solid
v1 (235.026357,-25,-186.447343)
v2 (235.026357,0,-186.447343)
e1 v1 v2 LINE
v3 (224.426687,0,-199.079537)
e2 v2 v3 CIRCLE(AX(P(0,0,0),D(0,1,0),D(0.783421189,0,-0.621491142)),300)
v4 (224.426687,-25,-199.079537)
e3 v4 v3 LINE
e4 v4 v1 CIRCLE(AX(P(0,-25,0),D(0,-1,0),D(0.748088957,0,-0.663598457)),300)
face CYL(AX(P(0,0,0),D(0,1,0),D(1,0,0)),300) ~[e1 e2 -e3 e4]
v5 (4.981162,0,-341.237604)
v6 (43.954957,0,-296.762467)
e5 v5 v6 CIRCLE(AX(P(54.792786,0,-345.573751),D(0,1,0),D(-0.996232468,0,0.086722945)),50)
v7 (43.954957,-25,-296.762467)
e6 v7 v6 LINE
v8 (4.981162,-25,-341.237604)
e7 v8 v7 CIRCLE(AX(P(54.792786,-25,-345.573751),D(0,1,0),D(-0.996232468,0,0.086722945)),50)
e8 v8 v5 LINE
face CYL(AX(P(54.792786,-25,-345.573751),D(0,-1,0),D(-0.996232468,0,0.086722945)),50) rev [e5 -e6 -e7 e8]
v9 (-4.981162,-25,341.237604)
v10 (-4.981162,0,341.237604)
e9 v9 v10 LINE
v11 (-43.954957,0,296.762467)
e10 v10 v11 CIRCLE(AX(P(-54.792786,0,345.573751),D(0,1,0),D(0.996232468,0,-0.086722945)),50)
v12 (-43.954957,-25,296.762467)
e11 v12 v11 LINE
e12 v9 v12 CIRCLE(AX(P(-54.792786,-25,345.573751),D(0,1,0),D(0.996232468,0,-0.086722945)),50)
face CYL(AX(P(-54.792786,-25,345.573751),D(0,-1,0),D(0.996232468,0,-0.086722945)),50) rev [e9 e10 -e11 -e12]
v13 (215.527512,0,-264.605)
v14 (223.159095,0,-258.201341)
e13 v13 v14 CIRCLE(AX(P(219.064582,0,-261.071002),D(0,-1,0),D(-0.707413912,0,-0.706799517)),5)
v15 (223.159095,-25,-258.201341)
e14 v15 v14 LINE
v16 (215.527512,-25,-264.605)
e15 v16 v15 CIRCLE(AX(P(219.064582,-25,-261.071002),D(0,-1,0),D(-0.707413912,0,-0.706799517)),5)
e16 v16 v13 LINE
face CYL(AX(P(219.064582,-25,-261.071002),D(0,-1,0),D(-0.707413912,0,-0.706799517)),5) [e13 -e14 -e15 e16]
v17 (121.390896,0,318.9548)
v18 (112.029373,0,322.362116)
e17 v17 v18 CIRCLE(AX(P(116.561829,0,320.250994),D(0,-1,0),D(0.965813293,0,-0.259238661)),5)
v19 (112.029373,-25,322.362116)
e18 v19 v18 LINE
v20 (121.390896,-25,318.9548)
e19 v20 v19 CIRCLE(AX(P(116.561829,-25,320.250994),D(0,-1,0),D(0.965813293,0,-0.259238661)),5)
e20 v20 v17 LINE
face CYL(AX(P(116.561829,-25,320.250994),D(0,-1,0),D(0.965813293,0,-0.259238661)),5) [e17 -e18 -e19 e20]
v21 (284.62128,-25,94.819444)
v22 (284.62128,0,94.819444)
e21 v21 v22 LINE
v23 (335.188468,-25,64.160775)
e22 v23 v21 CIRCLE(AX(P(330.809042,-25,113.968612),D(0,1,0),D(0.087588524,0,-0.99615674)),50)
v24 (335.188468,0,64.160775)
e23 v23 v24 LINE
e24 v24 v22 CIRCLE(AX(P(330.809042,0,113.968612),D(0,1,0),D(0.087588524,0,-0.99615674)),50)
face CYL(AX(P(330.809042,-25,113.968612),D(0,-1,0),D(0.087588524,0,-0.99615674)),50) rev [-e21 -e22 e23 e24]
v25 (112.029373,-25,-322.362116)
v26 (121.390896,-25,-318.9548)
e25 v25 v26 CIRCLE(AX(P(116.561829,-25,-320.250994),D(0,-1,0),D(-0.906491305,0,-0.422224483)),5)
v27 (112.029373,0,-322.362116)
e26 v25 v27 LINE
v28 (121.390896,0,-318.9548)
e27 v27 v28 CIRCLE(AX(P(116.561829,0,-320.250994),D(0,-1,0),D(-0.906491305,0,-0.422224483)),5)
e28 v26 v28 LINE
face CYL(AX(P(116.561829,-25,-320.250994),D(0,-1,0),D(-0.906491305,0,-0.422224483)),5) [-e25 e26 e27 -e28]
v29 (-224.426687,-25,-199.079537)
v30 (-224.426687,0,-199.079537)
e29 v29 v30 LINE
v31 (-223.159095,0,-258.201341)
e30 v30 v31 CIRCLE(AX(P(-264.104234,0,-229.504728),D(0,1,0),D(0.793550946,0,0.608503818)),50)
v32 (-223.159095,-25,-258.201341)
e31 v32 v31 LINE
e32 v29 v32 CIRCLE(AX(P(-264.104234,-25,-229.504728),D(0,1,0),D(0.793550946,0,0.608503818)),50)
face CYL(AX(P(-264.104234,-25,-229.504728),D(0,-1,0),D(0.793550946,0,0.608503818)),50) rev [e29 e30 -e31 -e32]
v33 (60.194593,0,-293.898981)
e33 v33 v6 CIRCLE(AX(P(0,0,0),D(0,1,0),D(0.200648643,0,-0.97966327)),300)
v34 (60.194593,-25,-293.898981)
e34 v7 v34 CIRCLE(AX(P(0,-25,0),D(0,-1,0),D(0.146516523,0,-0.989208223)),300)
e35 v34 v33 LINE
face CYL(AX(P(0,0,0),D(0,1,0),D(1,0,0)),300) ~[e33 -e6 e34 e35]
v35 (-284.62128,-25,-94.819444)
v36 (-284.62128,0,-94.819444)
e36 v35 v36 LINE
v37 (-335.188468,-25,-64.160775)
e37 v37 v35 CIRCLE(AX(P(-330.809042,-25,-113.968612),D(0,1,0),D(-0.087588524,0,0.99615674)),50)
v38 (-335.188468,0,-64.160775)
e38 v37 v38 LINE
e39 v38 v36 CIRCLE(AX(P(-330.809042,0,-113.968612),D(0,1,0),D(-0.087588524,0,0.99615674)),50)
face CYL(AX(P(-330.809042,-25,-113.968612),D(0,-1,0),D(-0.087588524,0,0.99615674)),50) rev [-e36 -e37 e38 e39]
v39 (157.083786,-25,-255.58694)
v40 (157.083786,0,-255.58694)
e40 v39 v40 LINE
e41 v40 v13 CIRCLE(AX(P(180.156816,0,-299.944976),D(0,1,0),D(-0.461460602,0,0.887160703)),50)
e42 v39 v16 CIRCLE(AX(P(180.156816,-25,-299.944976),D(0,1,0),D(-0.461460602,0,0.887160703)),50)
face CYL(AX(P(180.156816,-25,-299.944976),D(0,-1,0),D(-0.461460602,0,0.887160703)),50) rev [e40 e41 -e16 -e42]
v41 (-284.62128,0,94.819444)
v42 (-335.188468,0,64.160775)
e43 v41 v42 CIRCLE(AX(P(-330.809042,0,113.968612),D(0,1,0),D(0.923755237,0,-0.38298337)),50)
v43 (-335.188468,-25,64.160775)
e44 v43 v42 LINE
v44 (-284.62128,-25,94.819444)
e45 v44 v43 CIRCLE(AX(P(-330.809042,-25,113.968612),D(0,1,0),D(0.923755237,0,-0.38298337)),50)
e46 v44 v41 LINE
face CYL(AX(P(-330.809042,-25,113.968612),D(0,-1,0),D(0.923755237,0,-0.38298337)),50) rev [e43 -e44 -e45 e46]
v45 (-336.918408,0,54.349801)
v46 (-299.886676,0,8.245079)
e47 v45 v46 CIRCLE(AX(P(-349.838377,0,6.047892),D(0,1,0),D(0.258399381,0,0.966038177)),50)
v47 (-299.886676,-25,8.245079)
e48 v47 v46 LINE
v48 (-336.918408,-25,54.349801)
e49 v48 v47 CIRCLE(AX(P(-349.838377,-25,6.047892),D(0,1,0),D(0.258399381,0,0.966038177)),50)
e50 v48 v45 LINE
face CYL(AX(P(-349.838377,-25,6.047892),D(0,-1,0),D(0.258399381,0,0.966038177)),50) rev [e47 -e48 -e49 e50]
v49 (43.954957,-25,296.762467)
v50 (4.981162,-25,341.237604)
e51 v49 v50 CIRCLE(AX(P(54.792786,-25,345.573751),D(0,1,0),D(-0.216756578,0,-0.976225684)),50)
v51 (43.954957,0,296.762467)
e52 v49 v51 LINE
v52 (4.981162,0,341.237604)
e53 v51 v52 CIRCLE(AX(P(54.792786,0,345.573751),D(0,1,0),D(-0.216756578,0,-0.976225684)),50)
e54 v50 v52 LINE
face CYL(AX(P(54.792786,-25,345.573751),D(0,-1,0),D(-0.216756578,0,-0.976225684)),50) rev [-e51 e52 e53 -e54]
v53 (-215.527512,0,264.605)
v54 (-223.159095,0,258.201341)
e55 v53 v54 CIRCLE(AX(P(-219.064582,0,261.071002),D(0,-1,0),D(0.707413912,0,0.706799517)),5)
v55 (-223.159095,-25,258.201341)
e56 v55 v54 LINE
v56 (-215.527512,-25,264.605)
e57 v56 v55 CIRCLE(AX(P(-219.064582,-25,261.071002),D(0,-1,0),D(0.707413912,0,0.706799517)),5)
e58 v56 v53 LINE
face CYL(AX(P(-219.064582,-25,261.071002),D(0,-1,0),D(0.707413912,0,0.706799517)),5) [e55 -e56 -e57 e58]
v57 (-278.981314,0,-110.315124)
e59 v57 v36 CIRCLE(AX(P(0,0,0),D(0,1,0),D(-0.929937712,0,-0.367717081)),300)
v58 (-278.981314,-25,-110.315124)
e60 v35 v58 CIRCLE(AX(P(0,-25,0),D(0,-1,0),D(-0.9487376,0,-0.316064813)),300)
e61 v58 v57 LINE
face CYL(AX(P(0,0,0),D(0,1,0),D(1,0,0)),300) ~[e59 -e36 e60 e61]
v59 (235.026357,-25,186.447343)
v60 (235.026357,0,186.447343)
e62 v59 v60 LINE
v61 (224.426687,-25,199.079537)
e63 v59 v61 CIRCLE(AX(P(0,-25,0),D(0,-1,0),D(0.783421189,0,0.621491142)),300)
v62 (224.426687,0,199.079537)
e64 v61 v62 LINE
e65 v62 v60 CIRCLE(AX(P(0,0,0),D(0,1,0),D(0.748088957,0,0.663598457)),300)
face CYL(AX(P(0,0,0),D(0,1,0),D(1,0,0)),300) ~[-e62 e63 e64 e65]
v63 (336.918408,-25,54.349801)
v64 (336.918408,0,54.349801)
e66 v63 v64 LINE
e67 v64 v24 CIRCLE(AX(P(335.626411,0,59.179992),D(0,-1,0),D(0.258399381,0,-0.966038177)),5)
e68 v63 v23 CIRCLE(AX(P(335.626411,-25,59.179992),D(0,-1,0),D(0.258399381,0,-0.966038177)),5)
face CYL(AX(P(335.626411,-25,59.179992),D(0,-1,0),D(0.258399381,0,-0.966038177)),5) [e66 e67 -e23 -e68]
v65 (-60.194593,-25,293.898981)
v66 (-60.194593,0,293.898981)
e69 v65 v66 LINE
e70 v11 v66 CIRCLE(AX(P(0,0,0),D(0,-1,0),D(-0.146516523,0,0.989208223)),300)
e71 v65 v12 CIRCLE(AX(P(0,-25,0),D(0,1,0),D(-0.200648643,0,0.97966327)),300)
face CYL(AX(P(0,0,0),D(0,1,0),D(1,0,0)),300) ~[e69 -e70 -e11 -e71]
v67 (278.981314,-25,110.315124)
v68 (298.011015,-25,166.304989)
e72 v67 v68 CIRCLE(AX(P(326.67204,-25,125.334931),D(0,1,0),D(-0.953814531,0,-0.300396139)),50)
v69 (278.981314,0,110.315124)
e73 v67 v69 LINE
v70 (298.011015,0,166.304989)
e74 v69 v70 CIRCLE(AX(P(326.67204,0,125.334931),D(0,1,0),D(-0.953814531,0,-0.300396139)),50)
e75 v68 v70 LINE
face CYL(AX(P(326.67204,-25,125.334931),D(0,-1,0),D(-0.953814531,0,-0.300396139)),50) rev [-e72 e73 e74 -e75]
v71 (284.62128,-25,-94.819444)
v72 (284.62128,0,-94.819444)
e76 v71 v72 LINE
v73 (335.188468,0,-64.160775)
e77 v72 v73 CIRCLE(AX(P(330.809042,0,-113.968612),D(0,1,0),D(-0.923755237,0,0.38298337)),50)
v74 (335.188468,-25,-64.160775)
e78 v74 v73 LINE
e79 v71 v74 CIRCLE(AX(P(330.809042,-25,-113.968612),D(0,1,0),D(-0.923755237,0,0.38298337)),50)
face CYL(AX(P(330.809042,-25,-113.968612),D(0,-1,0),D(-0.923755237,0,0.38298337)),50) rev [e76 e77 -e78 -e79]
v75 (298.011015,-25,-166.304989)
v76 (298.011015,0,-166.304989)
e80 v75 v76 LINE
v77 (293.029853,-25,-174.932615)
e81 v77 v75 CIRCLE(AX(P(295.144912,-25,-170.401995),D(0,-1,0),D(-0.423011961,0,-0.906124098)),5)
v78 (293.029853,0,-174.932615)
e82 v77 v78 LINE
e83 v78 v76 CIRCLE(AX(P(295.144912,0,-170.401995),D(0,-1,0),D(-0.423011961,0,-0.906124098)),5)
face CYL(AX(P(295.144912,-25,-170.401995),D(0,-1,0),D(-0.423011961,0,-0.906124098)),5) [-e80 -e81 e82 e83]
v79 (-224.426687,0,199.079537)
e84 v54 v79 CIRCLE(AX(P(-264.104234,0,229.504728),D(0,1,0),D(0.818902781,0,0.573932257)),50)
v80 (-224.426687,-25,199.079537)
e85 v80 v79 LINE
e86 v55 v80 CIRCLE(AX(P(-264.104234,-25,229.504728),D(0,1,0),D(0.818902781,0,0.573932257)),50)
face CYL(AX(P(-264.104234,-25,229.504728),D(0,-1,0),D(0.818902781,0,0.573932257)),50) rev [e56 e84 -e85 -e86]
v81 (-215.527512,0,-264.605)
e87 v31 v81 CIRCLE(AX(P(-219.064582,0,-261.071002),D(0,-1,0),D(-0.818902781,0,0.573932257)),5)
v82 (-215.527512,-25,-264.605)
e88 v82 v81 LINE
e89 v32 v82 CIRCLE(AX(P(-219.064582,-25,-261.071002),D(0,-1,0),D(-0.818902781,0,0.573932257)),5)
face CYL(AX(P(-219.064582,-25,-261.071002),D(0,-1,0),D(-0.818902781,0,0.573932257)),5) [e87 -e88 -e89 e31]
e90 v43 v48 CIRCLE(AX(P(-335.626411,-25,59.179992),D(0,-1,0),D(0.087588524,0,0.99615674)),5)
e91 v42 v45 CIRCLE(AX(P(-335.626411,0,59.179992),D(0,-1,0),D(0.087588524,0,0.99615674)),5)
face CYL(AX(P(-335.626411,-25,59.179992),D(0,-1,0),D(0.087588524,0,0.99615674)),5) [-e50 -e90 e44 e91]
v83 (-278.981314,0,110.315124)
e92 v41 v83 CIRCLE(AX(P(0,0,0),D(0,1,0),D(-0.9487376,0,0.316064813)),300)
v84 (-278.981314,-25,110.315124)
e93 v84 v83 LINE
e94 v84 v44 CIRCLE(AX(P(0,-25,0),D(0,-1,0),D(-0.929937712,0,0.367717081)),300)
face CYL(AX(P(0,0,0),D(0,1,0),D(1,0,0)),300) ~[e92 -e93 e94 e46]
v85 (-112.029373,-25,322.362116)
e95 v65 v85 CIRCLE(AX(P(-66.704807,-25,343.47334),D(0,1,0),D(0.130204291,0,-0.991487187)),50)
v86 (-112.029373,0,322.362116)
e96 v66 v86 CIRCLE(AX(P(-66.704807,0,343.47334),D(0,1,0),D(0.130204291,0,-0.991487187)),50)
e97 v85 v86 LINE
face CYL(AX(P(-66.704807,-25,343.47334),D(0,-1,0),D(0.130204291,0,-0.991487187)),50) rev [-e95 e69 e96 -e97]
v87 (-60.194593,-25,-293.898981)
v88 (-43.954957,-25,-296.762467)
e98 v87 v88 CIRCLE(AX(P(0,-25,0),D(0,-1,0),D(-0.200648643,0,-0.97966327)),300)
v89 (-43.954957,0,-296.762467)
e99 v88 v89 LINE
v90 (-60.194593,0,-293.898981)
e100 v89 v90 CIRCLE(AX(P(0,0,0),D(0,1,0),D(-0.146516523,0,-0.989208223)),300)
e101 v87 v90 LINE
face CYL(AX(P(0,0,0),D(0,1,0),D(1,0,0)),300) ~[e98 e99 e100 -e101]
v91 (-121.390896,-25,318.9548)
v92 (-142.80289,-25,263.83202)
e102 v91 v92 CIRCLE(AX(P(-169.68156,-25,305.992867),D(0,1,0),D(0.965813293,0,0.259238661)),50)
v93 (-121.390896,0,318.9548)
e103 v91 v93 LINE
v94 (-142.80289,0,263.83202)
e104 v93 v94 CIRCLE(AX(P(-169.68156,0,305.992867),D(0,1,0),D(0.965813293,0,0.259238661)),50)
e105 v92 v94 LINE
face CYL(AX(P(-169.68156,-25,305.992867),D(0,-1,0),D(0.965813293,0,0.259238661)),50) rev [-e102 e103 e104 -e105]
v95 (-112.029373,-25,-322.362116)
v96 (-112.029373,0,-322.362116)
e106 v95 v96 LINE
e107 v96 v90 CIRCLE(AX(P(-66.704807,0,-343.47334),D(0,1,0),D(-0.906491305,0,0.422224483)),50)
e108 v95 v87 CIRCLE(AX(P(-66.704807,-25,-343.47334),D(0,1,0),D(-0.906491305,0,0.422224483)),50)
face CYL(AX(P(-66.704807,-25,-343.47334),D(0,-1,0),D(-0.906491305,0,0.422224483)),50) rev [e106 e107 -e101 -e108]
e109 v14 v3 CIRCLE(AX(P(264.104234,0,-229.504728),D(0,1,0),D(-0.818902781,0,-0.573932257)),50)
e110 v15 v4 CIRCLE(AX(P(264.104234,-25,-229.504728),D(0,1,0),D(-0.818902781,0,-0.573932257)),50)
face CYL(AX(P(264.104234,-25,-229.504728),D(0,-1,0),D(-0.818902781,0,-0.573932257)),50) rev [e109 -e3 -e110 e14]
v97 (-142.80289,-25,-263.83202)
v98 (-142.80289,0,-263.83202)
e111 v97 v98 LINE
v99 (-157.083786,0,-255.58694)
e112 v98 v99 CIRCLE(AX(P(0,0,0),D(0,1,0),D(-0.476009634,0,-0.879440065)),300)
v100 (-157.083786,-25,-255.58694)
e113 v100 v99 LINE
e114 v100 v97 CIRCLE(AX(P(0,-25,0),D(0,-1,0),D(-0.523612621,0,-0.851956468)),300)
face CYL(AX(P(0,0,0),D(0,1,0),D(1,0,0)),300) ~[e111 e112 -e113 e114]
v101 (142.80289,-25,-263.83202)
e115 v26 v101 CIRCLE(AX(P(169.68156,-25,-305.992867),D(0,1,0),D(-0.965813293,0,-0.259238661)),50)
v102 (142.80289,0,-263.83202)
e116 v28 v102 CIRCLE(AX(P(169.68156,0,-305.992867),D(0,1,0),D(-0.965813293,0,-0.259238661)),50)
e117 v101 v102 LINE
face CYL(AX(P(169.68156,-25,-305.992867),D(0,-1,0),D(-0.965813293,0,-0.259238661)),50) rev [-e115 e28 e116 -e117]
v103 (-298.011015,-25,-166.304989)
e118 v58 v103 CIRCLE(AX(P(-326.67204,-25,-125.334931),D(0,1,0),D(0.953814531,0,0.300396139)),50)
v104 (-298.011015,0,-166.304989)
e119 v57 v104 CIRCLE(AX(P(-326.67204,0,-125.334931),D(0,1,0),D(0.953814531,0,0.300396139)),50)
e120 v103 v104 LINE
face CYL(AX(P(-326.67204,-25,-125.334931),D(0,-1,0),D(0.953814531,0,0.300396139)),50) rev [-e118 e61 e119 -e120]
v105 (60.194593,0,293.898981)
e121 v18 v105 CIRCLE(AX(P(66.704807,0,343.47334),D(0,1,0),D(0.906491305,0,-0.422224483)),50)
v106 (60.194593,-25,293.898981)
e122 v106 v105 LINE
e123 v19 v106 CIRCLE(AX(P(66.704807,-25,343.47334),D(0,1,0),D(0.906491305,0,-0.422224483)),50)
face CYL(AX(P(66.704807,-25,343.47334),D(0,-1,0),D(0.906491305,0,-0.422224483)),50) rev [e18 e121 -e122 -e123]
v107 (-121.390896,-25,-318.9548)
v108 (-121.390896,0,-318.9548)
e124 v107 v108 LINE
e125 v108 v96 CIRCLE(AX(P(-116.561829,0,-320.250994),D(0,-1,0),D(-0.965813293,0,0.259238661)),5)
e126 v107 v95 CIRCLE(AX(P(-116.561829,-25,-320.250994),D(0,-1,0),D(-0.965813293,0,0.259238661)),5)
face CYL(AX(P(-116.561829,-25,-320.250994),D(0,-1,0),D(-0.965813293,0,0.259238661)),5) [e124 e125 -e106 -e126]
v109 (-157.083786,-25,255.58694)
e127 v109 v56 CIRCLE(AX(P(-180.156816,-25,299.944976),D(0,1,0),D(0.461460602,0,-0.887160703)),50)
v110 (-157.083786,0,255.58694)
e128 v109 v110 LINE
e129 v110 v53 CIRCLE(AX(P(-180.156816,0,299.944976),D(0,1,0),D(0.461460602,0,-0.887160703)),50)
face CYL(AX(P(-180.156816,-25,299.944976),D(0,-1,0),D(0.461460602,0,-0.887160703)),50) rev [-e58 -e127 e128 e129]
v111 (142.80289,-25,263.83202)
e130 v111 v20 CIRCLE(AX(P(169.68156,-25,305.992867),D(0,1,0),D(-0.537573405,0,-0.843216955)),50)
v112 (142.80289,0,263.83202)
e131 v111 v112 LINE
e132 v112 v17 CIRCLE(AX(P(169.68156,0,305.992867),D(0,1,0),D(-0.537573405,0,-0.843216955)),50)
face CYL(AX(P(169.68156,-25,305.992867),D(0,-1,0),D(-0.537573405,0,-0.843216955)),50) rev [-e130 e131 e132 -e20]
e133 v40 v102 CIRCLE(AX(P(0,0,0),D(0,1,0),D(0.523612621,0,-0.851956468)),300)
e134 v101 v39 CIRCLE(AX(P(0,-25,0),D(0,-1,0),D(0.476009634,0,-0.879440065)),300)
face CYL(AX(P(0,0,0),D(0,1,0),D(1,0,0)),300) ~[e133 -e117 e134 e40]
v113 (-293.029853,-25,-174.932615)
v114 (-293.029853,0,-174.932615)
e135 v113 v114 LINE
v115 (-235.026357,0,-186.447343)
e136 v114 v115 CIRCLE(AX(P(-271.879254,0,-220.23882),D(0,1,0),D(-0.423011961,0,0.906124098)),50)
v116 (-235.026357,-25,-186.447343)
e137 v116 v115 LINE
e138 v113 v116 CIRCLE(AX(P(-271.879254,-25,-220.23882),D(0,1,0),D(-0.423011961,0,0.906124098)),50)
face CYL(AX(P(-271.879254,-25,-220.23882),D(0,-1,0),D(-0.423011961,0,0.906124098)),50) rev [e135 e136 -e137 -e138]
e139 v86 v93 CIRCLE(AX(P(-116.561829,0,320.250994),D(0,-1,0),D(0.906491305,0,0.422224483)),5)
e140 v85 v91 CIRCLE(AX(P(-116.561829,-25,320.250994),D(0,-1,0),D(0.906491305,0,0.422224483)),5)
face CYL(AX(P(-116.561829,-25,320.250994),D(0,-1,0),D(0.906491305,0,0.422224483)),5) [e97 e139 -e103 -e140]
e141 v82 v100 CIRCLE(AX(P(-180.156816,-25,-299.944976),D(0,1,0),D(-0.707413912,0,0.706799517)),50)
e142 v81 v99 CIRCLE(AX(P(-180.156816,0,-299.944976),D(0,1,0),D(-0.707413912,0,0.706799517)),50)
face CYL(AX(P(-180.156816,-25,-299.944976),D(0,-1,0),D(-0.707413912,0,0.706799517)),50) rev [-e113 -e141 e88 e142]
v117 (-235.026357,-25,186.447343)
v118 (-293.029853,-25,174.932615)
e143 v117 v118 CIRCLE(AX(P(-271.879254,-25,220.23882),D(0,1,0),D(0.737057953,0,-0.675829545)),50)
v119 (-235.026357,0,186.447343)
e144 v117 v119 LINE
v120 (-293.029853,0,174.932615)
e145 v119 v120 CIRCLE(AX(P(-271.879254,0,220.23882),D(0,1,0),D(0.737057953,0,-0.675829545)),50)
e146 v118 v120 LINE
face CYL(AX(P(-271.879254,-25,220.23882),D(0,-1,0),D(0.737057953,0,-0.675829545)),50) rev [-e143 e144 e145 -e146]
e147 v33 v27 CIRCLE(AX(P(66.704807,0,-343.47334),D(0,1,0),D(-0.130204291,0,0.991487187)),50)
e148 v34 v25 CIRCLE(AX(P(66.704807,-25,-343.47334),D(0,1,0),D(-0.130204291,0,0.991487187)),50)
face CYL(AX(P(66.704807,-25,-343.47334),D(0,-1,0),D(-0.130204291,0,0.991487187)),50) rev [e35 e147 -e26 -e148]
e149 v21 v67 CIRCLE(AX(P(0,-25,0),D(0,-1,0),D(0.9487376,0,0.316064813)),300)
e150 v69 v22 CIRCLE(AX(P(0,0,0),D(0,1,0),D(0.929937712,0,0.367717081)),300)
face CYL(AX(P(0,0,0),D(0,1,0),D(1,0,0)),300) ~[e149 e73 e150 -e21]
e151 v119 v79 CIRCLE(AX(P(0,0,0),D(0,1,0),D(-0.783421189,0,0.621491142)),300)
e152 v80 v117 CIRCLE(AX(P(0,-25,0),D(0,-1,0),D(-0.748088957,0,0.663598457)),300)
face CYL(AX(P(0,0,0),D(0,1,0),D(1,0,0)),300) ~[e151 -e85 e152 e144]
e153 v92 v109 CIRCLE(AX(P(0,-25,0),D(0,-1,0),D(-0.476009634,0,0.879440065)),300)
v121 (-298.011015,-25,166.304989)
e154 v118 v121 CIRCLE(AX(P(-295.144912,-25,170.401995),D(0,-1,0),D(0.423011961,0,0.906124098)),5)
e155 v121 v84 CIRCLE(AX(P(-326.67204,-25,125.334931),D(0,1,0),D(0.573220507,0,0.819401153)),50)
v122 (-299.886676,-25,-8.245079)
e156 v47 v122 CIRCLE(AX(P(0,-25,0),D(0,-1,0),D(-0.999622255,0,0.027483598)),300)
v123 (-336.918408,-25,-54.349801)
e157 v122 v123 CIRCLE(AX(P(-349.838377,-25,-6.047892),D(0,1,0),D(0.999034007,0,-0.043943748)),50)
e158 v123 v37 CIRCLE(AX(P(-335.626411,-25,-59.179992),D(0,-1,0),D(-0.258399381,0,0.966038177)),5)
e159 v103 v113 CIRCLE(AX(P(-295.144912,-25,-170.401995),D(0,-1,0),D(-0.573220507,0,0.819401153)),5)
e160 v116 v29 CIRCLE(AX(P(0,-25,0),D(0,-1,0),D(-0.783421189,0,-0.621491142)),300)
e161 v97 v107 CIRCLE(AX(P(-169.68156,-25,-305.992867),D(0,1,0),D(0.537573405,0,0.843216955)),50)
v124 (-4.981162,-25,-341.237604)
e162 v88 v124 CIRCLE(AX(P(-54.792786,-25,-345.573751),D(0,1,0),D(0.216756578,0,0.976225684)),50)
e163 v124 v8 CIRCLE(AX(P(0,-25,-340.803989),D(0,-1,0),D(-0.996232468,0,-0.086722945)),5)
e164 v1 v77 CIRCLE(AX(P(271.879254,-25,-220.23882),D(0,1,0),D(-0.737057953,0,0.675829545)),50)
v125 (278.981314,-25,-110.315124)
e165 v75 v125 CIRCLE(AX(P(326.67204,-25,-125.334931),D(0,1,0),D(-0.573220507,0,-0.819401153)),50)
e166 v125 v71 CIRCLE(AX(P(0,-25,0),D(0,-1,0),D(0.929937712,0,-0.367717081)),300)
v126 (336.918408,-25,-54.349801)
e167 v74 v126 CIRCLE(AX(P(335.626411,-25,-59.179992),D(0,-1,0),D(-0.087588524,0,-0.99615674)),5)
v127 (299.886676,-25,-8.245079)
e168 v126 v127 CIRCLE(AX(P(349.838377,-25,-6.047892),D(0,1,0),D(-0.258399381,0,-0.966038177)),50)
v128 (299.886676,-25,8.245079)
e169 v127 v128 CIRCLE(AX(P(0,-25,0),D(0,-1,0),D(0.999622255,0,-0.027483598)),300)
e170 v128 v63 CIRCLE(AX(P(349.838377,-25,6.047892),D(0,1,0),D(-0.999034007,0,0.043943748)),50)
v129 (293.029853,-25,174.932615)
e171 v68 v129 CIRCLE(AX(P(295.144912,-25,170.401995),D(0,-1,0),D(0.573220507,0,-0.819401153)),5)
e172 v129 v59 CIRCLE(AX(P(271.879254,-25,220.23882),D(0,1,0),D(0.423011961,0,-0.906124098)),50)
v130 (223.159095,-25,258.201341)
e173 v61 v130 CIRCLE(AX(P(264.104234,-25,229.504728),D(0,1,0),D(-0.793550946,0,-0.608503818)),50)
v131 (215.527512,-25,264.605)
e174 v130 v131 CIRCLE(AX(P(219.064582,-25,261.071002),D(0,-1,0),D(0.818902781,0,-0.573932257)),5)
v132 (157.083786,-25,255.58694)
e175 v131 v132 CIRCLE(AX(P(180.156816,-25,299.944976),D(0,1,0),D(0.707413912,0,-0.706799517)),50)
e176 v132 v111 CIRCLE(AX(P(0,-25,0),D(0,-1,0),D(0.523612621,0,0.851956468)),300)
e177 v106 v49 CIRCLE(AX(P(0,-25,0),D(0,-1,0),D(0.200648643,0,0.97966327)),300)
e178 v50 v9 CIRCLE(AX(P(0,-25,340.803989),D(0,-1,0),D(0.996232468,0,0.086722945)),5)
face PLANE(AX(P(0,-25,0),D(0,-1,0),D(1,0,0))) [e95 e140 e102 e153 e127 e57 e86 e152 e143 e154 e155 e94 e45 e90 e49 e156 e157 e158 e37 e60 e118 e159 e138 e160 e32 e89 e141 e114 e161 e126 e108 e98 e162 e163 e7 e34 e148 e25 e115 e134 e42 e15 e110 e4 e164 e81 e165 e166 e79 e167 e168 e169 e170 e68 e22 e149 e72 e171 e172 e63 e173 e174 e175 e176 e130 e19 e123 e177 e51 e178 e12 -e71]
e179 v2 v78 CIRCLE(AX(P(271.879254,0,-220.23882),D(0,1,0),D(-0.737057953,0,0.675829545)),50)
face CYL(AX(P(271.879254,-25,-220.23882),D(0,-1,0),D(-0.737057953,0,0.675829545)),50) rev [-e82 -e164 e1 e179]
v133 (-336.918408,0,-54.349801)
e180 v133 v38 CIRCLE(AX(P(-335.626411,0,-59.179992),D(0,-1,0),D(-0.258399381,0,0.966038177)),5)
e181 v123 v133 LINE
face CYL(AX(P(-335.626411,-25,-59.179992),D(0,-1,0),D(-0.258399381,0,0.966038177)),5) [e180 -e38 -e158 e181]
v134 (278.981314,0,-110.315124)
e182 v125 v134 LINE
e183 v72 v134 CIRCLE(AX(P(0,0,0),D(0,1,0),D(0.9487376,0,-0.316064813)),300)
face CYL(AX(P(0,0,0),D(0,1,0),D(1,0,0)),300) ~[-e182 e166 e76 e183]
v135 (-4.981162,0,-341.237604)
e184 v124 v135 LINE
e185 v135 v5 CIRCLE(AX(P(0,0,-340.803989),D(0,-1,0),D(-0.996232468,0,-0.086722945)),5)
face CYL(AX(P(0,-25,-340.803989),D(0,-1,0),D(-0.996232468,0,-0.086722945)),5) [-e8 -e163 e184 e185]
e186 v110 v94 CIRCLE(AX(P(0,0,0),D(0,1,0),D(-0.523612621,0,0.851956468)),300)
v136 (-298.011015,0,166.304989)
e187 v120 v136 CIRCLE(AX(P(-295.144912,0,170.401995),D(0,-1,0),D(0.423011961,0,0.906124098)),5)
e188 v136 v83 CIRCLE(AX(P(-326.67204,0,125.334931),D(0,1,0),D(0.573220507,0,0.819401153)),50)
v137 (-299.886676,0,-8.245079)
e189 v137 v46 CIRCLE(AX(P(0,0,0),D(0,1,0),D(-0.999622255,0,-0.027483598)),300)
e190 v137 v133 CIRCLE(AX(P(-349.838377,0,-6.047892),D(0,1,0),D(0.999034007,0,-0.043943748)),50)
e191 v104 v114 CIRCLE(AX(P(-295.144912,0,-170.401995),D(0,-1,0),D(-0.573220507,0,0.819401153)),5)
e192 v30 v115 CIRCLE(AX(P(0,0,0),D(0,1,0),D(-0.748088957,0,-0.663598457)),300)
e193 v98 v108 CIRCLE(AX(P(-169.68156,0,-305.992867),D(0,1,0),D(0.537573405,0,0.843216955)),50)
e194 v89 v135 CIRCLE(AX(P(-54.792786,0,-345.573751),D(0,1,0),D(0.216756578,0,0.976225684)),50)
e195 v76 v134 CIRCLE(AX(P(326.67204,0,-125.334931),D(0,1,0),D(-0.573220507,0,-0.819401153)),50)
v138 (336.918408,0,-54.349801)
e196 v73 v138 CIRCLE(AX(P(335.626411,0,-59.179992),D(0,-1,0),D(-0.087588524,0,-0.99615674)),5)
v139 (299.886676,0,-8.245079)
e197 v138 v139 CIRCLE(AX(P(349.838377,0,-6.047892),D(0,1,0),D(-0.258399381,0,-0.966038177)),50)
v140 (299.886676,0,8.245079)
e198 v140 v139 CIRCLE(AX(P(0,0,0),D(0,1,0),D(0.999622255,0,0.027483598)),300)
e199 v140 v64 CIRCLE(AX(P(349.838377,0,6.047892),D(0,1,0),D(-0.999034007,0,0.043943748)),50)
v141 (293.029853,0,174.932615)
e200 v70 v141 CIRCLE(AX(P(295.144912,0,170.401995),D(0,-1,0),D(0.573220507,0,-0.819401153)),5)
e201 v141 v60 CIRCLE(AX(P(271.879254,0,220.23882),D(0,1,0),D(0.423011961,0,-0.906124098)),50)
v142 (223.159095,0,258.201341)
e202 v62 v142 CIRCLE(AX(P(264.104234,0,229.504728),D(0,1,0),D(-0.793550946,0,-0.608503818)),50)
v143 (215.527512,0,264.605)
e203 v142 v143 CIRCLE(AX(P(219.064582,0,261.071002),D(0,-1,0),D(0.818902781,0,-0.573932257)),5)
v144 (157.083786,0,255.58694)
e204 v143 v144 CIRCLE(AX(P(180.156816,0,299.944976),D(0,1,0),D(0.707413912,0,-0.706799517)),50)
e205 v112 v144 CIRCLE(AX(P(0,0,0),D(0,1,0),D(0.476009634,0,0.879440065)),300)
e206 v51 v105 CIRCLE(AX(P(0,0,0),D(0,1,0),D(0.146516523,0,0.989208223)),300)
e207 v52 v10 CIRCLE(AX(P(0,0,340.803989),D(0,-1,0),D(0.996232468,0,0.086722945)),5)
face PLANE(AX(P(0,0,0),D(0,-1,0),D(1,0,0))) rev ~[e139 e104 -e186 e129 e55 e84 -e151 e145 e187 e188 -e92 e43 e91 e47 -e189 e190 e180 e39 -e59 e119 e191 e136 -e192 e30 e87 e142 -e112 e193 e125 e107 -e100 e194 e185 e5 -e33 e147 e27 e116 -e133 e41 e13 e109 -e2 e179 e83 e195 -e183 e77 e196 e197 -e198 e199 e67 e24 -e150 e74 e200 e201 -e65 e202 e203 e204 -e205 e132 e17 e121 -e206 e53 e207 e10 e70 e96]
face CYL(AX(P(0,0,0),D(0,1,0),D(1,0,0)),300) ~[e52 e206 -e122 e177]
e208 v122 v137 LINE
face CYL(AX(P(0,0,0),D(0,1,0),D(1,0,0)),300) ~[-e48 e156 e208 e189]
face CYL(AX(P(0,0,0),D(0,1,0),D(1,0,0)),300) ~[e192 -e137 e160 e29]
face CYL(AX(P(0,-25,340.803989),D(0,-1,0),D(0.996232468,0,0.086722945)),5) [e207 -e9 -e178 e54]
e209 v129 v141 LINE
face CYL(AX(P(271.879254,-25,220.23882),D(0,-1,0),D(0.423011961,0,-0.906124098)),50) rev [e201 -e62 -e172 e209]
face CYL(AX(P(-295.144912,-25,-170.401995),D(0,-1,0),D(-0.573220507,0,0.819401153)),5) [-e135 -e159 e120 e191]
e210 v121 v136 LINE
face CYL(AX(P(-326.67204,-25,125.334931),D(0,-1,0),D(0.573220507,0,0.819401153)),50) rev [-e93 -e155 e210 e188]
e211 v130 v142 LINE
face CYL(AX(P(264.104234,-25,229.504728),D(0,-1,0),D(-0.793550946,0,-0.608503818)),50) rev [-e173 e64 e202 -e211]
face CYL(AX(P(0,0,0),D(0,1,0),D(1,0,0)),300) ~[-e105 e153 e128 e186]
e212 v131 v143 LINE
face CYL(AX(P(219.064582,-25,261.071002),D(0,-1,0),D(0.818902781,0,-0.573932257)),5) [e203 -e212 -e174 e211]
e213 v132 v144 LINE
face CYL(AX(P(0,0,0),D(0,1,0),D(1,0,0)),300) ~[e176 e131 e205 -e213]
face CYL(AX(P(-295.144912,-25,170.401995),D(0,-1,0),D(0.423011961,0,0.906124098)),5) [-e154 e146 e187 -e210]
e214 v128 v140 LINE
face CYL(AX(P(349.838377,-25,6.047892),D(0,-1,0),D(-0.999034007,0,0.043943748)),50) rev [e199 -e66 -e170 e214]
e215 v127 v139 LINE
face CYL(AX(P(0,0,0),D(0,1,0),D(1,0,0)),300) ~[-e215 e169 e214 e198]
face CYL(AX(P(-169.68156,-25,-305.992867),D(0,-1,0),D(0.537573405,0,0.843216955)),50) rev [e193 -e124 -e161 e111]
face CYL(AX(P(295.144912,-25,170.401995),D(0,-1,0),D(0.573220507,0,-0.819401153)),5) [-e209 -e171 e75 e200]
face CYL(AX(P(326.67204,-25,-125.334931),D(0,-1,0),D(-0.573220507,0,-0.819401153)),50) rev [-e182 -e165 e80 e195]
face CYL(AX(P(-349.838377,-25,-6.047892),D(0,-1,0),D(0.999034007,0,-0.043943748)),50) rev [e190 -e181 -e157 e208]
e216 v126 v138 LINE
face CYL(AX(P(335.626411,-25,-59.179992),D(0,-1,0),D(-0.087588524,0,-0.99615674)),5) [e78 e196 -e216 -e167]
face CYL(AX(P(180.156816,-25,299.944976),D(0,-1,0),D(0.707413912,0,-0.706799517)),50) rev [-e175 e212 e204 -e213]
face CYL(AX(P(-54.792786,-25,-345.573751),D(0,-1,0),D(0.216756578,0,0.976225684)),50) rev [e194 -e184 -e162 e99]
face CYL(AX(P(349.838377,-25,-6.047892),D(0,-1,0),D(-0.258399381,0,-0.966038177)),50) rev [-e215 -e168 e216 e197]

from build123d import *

# Parameters (mm, degrees)
F0_R            = 300
F1_DEPTH        = 25
F3_DEPTH        = 25
F3_COPIES_COUNT = 18


# Not quite as in the source:
# - a pattern or mirror of a feature is missing from the dataset's text; its kind, count and spacing are read off the source's solid


with BuildPart() as f1:
    # F0 (on Front) → F1 (new body)
    with BuildSketch(Plane.XZ):
        Circle(F0_R)
    extrude(amount=F1_DEPTH)

    # F2 (on face) → F3 (join, through all)
    with BuildSketch(Plane.XZ.offset(25)):
        with BuildLine():
            ThreePointArc((43.9549568499, 296.7624669131), (46.962798618, 296.1906436564), (50, 295.803989155))
            ThreePointArc((50, 295.803989155), (46.9799228296, 296.2986446998), (43.9549568499, 296.7624669131))
        make_face()
        with BuildLine():
            ThreePointArc((-50, 295.803989155), (-46.962798618, 296.1906436564), (-43.9549568499, 296.7624669131))
            ThreePointArc((-43.9549568499, 296.7624669131), (-46.9799228296, 296.2986446998), (-50, 295.803989155))
        make_face()
        with BuildLine():
            ThreePointArc((-43.9549568499, 296.7624669131), (0, 300), (43.9549568499, 296.7624669131))
            ThreePointArc((43.9549568499, 296.7624669131), (17.1882851118, 312.6207310432), (4.9811623415, 341.2376038778))
            ThreePointArc((4.9811623415, 341.2376038778), (0, 345.803989155), (-4.9811623415, 341.2376038778))
            ThreePointArc((-4.9811623415, 341.2376038778), (-17.1882851118, 312.6207310432), (-43.9549568499, 296.7624669131))
        make_face()
    f3 = extrude(amount=-F3_DEPTH)

    # F3_copies: F3 ×18 about axis
    f3_copies_axis = Axis((0, 0, 0), (0, 1, 0))
    for i in range(1, F3_COPIES_COUNT):
        add(f3.rotate(f3_copies_axis, i * 360 / F3_COPIES_COUNT))


solid = f1.part
